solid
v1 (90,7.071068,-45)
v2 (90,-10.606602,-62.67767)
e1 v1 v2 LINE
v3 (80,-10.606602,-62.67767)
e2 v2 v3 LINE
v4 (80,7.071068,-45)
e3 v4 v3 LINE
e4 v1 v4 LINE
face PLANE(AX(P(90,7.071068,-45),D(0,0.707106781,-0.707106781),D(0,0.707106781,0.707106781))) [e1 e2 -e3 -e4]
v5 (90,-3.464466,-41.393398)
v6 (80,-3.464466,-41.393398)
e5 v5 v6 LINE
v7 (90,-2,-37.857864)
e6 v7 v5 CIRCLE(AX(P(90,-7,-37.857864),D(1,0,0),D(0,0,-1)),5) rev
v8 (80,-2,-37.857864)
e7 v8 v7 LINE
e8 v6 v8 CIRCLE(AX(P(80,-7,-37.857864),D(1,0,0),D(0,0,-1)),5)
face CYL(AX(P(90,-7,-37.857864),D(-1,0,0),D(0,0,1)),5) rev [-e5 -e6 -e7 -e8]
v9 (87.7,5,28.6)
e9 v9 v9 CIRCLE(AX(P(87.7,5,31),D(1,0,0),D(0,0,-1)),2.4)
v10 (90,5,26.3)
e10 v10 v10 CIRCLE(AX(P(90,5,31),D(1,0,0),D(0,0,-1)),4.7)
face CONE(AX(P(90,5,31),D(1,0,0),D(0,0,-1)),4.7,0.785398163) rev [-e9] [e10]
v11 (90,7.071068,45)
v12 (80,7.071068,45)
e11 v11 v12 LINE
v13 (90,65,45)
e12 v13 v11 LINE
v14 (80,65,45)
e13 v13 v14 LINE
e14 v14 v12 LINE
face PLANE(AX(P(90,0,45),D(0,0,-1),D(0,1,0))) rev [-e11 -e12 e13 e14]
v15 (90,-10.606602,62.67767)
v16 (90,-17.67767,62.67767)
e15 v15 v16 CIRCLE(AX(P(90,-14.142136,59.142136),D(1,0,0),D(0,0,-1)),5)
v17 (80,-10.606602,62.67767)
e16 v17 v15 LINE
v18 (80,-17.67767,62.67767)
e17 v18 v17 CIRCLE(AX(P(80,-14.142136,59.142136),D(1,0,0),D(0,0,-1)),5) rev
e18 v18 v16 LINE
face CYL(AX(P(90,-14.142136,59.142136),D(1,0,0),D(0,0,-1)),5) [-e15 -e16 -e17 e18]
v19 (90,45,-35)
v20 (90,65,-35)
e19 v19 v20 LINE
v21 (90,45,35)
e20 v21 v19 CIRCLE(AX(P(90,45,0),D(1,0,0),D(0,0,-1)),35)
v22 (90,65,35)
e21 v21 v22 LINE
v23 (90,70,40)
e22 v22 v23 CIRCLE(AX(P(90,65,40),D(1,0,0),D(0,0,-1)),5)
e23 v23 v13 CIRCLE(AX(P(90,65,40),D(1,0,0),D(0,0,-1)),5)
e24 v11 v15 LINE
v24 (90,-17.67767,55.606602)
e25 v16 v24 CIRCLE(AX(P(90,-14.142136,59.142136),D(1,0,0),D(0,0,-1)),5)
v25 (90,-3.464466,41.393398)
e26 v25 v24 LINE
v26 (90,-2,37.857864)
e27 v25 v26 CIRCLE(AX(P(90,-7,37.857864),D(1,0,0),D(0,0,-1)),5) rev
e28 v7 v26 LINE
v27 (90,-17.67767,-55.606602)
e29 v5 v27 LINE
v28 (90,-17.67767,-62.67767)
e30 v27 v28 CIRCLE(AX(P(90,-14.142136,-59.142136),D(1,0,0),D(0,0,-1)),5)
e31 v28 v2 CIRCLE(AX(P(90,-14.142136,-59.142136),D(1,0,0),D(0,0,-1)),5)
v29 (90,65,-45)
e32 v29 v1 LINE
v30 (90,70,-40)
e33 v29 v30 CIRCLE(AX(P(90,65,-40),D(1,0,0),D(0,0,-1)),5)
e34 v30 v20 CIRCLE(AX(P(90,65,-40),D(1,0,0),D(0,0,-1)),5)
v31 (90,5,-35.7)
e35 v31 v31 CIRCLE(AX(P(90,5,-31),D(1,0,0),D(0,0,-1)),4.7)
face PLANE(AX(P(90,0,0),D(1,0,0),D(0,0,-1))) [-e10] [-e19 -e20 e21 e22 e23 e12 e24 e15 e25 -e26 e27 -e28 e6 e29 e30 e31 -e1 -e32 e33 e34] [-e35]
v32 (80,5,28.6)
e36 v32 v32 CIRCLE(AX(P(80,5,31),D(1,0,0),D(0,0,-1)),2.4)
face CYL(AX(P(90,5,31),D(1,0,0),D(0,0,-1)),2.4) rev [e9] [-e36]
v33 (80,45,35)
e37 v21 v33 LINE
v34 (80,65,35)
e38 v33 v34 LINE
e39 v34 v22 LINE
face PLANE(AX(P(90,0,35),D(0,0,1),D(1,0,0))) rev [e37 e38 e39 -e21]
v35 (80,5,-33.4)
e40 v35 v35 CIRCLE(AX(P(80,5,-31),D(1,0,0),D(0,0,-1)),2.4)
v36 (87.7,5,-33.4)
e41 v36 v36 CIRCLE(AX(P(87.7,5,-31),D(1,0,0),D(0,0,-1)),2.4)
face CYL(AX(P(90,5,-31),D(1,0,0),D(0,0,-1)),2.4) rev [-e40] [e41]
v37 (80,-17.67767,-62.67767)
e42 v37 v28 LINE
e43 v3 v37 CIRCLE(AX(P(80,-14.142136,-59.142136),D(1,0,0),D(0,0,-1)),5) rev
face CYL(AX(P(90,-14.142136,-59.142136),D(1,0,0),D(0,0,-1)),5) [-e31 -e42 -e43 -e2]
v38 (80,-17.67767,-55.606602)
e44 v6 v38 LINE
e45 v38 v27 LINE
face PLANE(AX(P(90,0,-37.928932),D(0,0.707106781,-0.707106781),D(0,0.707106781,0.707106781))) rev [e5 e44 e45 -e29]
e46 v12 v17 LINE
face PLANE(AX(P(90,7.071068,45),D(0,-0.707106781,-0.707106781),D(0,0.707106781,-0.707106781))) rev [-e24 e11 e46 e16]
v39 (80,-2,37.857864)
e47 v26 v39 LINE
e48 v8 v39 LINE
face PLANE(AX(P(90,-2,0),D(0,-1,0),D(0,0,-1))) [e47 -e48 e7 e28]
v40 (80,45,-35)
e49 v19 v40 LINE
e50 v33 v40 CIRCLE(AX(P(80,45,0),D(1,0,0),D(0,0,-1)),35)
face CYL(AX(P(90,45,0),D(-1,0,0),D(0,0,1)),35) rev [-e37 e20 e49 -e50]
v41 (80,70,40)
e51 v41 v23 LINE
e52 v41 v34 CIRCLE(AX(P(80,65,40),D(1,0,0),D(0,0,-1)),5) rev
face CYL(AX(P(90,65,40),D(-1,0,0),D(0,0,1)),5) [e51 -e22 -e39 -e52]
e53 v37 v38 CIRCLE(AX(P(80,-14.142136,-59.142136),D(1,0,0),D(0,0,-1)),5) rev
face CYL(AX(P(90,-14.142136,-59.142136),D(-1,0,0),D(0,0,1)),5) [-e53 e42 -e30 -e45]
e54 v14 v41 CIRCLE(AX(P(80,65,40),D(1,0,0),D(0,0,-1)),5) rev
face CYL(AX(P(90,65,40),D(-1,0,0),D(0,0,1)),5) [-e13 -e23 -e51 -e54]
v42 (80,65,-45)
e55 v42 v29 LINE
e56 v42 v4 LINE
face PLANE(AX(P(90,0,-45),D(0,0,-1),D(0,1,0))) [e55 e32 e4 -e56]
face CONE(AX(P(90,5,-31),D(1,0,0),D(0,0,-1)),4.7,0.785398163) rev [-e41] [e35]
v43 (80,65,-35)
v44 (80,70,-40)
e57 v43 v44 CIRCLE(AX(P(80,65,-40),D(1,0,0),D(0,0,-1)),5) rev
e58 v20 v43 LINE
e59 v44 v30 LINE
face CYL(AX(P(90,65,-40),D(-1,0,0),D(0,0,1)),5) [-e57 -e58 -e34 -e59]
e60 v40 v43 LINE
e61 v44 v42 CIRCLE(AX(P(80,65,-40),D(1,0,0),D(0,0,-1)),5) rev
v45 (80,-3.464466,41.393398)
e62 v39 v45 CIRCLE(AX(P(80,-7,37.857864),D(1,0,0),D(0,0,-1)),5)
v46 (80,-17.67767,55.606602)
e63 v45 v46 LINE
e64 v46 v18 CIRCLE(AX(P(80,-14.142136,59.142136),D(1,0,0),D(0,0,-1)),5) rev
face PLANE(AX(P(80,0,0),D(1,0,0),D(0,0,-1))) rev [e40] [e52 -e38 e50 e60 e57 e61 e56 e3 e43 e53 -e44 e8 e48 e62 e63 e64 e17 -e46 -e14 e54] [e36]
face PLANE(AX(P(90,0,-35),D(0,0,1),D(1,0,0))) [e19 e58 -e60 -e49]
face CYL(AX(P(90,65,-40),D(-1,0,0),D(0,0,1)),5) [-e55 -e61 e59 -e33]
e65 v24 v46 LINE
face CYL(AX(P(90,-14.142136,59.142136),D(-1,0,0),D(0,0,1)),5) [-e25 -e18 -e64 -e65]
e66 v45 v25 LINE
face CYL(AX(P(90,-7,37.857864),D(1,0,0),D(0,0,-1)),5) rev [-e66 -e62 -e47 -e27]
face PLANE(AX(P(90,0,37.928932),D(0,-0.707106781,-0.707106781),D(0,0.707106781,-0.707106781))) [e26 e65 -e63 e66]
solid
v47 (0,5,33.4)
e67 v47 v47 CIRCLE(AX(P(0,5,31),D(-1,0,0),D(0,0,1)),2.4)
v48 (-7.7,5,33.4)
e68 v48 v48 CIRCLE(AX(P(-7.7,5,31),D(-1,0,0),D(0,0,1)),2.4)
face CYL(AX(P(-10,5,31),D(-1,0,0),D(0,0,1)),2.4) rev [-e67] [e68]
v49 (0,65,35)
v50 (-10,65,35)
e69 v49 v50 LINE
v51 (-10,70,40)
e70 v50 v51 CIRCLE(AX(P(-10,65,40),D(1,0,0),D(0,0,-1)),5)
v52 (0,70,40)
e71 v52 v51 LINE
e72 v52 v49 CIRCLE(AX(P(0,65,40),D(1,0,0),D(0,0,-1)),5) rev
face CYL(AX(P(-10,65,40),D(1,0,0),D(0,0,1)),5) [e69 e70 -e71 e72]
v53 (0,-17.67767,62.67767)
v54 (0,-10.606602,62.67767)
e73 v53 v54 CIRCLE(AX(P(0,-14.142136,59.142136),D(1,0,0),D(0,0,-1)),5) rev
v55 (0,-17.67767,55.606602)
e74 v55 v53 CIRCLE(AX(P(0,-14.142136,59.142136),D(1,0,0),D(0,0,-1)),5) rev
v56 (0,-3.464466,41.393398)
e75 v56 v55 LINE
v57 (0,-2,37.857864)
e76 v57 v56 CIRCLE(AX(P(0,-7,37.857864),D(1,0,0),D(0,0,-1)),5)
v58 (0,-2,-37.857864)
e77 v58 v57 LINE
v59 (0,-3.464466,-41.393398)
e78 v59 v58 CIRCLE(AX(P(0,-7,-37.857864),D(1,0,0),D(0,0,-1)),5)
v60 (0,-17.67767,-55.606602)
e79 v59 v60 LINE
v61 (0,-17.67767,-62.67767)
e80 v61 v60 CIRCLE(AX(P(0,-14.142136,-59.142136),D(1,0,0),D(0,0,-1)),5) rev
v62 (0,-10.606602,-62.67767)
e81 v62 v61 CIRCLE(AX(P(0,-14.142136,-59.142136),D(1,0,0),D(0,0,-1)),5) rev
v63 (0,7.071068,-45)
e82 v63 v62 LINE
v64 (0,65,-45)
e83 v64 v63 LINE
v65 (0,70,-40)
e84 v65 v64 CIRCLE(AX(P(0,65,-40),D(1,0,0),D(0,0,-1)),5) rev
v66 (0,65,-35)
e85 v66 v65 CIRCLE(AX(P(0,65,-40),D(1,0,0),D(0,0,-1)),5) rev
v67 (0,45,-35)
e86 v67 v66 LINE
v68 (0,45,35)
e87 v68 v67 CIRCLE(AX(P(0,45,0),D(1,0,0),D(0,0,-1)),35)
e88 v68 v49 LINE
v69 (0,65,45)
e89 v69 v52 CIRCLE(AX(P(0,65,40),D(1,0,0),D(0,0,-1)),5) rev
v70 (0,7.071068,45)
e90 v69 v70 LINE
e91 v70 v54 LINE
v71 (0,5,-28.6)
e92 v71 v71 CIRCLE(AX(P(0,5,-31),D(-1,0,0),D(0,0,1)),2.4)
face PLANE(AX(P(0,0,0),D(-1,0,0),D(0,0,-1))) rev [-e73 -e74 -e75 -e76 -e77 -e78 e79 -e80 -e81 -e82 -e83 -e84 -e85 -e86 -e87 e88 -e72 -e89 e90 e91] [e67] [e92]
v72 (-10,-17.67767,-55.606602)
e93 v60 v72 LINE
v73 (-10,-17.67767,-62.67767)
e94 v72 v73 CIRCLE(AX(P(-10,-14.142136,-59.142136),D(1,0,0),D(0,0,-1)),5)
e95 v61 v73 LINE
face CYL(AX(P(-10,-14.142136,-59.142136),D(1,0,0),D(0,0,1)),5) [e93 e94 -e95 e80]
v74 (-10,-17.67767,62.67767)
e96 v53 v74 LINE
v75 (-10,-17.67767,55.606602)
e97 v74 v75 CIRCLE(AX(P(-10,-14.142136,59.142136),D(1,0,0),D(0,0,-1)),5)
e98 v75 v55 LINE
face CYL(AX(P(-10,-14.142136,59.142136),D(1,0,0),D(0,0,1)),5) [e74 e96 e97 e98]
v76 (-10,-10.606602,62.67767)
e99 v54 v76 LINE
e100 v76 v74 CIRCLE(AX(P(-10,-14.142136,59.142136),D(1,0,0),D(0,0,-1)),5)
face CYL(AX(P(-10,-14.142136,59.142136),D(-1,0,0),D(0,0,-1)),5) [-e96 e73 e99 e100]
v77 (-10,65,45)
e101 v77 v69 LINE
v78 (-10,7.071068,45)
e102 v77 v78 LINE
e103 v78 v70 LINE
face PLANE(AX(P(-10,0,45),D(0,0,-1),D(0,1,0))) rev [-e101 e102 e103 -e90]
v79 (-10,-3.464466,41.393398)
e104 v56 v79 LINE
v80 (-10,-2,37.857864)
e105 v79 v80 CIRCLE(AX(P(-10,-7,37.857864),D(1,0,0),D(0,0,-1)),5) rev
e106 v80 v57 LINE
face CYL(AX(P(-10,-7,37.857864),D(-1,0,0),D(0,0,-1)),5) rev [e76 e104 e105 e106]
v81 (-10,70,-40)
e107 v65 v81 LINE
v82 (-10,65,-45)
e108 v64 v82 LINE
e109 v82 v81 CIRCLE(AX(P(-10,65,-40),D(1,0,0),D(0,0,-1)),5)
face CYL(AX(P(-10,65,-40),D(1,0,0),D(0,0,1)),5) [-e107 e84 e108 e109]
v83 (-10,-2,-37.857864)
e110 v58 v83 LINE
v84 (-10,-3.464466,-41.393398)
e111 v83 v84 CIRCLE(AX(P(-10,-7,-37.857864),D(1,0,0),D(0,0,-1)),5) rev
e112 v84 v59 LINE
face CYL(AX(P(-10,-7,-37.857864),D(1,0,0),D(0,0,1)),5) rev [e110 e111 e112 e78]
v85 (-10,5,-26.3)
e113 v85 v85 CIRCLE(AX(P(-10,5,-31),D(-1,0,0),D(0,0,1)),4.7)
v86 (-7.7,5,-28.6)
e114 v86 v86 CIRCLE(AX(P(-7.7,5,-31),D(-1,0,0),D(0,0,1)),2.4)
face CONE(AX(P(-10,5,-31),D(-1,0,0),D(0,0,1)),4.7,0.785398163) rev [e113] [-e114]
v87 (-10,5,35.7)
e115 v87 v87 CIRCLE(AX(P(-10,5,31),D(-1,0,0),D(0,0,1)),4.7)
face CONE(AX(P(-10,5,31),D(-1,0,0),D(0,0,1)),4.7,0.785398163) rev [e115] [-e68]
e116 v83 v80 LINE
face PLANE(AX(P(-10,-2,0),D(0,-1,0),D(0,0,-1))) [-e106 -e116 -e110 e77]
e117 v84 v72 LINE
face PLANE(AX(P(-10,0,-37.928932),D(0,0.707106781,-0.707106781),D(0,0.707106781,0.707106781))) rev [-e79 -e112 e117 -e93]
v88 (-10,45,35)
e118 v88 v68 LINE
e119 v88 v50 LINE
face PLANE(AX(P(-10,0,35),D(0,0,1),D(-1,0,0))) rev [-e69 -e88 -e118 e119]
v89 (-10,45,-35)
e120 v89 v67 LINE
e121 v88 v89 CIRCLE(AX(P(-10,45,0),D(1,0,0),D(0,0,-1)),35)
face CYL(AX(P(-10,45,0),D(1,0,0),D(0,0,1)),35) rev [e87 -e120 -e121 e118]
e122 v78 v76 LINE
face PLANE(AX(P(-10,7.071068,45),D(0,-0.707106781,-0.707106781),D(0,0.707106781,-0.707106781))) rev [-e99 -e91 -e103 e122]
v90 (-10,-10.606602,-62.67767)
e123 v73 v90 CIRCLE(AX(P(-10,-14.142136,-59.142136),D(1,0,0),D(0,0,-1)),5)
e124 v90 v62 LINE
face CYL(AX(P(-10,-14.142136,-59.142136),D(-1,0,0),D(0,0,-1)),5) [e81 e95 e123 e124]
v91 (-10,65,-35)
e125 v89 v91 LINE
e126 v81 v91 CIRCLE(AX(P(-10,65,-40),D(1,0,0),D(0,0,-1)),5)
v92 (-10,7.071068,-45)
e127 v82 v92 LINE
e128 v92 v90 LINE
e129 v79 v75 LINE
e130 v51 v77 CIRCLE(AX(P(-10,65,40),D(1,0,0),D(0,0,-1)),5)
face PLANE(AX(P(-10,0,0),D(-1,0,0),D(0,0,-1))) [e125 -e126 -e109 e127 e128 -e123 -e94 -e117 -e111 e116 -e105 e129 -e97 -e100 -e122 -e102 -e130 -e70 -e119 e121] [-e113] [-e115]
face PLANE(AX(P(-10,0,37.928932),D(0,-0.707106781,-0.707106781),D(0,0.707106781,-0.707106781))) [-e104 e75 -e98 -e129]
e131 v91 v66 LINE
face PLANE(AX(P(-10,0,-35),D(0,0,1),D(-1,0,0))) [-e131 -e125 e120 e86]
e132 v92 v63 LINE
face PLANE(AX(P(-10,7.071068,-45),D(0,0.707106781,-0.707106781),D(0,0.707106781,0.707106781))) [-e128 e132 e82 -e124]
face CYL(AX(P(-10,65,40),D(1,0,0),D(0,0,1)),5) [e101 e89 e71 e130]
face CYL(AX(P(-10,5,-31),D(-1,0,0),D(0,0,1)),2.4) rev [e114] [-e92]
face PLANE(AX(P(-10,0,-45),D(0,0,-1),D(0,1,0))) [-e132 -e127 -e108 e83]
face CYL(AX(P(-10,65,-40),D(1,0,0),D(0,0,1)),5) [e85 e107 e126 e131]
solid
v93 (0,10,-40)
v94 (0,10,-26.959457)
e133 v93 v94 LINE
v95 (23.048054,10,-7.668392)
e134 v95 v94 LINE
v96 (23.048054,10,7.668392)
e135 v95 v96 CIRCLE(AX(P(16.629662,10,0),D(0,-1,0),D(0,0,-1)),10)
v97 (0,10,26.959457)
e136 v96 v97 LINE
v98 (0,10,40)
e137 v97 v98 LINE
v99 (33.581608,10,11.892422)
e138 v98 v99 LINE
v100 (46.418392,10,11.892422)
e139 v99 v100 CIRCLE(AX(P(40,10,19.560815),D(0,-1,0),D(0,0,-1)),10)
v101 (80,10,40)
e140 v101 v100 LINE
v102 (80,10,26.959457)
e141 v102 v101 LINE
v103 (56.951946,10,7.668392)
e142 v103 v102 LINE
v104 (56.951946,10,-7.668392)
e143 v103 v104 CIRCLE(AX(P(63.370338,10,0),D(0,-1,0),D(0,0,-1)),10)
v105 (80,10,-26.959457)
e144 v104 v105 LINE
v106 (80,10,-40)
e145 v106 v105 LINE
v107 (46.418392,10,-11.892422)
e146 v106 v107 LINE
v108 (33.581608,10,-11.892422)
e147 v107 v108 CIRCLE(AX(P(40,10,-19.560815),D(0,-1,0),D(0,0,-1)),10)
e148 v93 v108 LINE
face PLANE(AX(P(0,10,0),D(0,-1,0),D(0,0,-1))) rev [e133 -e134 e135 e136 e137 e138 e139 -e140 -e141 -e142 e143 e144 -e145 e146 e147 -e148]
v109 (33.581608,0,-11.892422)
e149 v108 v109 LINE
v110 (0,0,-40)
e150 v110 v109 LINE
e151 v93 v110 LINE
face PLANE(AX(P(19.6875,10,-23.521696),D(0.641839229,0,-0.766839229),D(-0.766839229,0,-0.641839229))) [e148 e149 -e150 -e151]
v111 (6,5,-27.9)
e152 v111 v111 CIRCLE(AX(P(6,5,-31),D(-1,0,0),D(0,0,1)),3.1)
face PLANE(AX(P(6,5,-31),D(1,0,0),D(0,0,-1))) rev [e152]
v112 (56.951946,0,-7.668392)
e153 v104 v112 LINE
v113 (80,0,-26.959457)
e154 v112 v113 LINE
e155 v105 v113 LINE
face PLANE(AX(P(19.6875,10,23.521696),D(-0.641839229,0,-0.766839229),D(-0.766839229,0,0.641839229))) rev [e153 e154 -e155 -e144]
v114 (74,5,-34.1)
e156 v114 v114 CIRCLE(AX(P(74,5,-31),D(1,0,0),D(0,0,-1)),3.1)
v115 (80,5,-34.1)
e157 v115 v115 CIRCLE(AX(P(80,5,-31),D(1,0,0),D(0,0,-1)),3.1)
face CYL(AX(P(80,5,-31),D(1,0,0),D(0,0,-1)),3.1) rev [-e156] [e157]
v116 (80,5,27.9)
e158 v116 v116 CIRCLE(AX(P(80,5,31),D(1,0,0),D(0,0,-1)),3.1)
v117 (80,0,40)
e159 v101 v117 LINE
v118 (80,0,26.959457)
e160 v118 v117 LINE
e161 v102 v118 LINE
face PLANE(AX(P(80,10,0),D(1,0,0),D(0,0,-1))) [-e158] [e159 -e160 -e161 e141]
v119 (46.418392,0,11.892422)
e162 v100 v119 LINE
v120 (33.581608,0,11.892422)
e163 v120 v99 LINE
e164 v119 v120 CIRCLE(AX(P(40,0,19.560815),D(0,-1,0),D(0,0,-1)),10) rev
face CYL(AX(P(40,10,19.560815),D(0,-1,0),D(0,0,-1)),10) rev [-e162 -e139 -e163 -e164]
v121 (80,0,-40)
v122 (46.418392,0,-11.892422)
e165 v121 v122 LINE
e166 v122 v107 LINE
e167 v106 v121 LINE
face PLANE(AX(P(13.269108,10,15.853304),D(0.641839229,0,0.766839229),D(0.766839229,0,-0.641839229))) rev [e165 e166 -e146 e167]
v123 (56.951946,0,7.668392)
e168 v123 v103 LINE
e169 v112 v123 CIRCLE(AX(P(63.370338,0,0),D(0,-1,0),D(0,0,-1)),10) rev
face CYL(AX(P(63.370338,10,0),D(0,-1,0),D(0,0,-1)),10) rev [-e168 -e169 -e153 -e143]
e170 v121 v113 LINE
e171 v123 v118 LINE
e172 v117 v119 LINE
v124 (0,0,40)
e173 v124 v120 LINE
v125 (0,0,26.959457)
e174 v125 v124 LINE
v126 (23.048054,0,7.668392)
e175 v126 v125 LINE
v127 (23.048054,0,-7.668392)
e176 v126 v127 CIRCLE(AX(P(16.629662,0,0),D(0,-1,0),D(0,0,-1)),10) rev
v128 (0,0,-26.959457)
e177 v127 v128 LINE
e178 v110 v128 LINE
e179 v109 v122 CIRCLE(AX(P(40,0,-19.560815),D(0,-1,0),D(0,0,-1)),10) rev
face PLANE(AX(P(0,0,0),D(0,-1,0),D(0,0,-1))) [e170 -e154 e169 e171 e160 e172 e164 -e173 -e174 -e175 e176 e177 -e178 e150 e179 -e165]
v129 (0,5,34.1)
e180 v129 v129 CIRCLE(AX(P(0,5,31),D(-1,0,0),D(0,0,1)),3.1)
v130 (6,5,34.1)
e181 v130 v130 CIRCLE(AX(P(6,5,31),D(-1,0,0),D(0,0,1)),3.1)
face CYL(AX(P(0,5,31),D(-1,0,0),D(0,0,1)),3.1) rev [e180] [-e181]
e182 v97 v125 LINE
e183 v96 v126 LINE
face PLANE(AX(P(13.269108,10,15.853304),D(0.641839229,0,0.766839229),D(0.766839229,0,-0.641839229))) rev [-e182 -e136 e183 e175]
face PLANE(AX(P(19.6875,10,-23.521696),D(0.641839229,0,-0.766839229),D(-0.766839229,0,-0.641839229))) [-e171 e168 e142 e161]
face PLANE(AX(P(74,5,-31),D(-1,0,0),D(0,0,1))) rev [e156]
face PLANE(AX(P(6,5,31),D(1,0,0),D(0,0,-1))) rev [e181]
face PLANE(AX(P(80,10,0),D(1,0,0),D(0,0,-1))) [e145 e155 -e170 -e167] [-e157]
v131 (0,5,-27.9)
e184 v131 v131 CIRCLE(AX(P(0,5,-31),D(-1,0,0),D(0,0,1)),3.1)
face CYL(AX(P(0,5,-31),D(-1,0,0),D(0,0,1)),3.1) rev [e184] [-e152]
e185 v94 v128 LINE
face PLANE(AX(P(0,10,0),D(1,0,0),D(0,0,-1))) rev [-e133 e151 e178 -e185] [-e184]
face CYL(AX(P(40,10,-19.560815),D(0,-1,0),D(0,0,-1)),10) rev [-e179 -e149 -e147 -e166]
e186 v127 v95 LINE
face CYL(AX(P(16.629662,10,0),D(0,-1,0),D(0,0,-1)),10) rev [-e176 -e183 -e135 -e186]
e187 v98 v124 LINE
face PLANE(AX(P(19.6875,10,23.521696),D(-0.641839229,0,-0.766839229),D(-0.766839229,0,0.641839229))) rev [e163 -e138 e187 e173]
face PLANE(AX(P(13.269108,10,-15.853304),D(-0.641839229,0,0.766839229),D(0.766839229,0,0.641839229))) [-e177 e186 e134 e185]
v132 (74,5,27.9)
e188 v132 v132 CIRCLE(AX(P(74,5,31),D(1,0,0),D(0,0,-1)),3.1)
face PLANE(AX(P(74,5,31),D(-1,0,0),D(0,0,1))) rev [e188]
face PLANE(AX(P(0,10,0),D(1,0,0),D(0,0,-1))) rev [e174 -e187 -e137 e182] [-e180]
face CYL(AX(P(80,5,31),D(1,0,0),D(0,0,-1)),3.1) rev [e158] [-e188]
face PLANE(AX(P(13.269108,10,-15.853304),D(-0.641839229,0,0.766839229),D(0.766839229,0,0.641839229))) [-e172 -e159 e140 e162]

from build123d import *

# Parameters (mm, degrees)
BOSS_EXTRUDE1_DEPTH                            = 10
FILLET1_R                                      = 5
LPATTERN1_COUNT                                = 2
LPATTERN1_PITCH                                = 80
BOSS_EXTRUDE2_DEPTH                            = 10
FILLET2_R                                      = 10
F_6_0MM_DOWEL_HOLE1_OUTLINE_R                  = 3.1
F_6_0MM_DOWEL_HOLE1_DEPTH                      = 6
CSK_FOR_M4_FLAT_HEAD_MACHINE_SCREW3_AT_2_COUNT = 2
CSK_FOR_M4_FLAT_HEAD_MACHINE_SCREW3_AT_2_PITCH = 62
CSK_FOR_M4_FLAT_HEAD_MACHINE_SCREW4_AT_2_COUNT = 2
CSK_FOR_M4_FLAT_HEAD_MACHINE_SCREW4_AT_2_PITCH = 62


# Read off the part's stored shape, not the designer's step: Ø6.0mm Dowel Hole1
with BuildPart() as part:
    # Sketch1 → Boss-Extrude1 (new body)
    with BuildSketch(Plane(origin=(0, 0, 0), x_dir=(0, 0, -1), z_dir=(1, 0, 0))):
        with BuildLine():
            Line((-45, 70), (-45, 7.071067812))
            Line((-45, 7.071067812), (-66.213203436, -14.142135624))
            Line((-66.213203436, -14.142135624), (-59.142135624, -21.213203436))
            Line((-59.142135624, -21.213203436), (-39.928932188, -2))
            Line((-39.928932188, -2), (39.928932188, -2))
            Line((39.928932188, -2), (59.142135624, -21.213203436))
            Line((59.142135624, -21.213203436), (66.213203436, -14.142135624))
            Line((66.213203436, -14.142135624), (45, 7.071067812))
            Line((45, 7.071067812), (45, 70))
            Line((45, 70), (35, 70))
            Line((35, 70), (35, 45))
            ThreePointArc((35, 45), (0, 10), (-35, 45))
            Line((-35, 45), (-35, 70))
            Line((-35, 70), (-45, 70))
        make_face()
    extrude(amount=BOSS_EXTRUDE1_DEPTH)

    # Fillet1
    fillet1_edges = [part.edges().sort_by_distance(p)[0] for p in [
        (5, 70, -45),
        (5, 70, -35),
        (5, 70, 35),
        (5, 70, 45),
        (5, -14.142135624, 66.213203436),
        (5, -21.213203436, 59.142135624),
        (5, -21.213203436, -59.142135624),
        (5, -14.142135624, -66.213203436),
        (5, -2, 39.928932188),
        (5, -2, -39.928932188),
    ]]
    fillet(fillet1_edges, radius=FILLET1_R - 0.0001)  # a hair under: the kernel refuses the full size


with BuildPart() as lpattern1_1:
    # LPattern1: pattern copy
    add(part.part.moved(Location(Vector(1, 0, 0) * (1 * LPATTERN1_PITCH))))

    # Sketch10 → CSK for M4 Flat Head Machine Screw3 (revolve, cut)
    with BuildSketch(Plane(origin=(90, 5, -31), x_dir=(0, 0, -1), z_dir=(0, 1, 0))):
        Polygon((0, 0), (0, 100), (2.4, 100), (2.4, 2.3), (4.7, 0), align=None)
    csk_for_m4_flat_head_machine_screw3 = revolve(axis=Axis((96.35, 5, -31), (-1, 0, 0)), mode=Mode.SUBTRACT)

    # CSK for M4 Flat Head Machine Screw3 at 2: CSK for M4 Flat Head Machine Screw3 ×2
    with Locations(*[(0, 0, i * CSK_FOR_M4_FLAT_HEAD_MACHINE_SCREW3_AT_2_PITCH) for i in range(1, CSK_FOR_M4_FLAT_HEAD_MACHINE_SCREW3_AT_2_COUNT)]):
        add(csk_for_m4_flat_head_machine_screw3, mode=Mode.SUBTRACT)


with BuildPart() as body_3:
    # Sketch2 → Boss-Extrude2 (new body)
    with BuildSketch(Plane.XZ):
        Polygon((0, -26.959456928), (0, -40), (40, -6.520271536), (80, -40), (80, -26.959456928), (47.790112806, 0), (80, 26.959456928), (80, 40), (40, 6.520271536), (0, 40), (0, 26.959456928), (32.209887194, 0), align=None)
    extrude(amount=-BOSS_EXTRUDE2_DEPTH)

    # Fillet2
    fillet2_edges = [body_3.edges().sort_by_distance(p)[0] for p in [
        (32.209887194, 5, 0),
        (40, 5, 6.520271536),
        (47.790112806, 5, 0),
        (40, 5, -6.520271536),
    ]]
    fillet(fillet2_edges, radius=FILLET2_R)

    # Ø6.0mm Dowel Hole1 outline → Ø6.0mm Dowel Hole1 (cut)
    with BuildSketch(Plane.YZ):
        with Locations((5, 31)):
            Circle(F_6_0MM_DOWEL_HOLE1_OUTLINE_R)
        with Locations((5, -31)):
            Circle(F_6_0MM_DOWEL_HOLE1_OUTLINE_R)
    f_6_0mm_dowel_hole1 = extrude(amount=F_6_0MM_DOWEL_HOLE1_DEPTH, mode=Mode.SUBTRACT)

    # Mirror1: Ø6.0mm Dowel Hole1 across plane
    add(f_6_0mm_dowel_hole1.mirror(Plane.ZY.offset(-40)), mode=Mode.SUBTRACT)


with BuildPart() as body_4:
    # Mirror2: mirrored copy
    add(part.part.mirror(Plane(origin=(0, 0, 0), x_dir=(0, 0, 1), z_dir=(1, 0, 0))))

    # Sketch12 → CSK for M4 Flat Head Machine Screw4 (revolve, cut)
    with BuildSketch(Plane(origin=(-10, 5, -31), x_dir=(0, 0, 1), z_dir=(0, 1, 0))):
        Polygon((0, 0), (0, 100), (2.4, 100), (2.4, 2.3), (4.7, 0), align=None)
    csk_for_m4_flat_head_machine_screw4 = revolve(axis=Axis((-16.35, 5, -31), (1, 0, 0)), mode=Mode.SUBTRACT)

    # CSK for M4 Flat Head Machine Screw4 at 2: CSK for M4 Flat Head Machine Screw4 ×2
    with Locations(*[(0, 0, i * CSK_FOR_M4_FLAT_HEAD_MACHINE_SCREW4_AT_2_PITCH) for i in range(1, CSK_FOR_M4_FLAT_HEAD_MACHINE_SCREW4_AT_2_COUNT)]):
        add(csk_for_m4_flat_head_machine_screw4, mode=Mode.SUBTRACT)


solid = Compound([lpattern1_1.part, body_3.part, body_4.part])
